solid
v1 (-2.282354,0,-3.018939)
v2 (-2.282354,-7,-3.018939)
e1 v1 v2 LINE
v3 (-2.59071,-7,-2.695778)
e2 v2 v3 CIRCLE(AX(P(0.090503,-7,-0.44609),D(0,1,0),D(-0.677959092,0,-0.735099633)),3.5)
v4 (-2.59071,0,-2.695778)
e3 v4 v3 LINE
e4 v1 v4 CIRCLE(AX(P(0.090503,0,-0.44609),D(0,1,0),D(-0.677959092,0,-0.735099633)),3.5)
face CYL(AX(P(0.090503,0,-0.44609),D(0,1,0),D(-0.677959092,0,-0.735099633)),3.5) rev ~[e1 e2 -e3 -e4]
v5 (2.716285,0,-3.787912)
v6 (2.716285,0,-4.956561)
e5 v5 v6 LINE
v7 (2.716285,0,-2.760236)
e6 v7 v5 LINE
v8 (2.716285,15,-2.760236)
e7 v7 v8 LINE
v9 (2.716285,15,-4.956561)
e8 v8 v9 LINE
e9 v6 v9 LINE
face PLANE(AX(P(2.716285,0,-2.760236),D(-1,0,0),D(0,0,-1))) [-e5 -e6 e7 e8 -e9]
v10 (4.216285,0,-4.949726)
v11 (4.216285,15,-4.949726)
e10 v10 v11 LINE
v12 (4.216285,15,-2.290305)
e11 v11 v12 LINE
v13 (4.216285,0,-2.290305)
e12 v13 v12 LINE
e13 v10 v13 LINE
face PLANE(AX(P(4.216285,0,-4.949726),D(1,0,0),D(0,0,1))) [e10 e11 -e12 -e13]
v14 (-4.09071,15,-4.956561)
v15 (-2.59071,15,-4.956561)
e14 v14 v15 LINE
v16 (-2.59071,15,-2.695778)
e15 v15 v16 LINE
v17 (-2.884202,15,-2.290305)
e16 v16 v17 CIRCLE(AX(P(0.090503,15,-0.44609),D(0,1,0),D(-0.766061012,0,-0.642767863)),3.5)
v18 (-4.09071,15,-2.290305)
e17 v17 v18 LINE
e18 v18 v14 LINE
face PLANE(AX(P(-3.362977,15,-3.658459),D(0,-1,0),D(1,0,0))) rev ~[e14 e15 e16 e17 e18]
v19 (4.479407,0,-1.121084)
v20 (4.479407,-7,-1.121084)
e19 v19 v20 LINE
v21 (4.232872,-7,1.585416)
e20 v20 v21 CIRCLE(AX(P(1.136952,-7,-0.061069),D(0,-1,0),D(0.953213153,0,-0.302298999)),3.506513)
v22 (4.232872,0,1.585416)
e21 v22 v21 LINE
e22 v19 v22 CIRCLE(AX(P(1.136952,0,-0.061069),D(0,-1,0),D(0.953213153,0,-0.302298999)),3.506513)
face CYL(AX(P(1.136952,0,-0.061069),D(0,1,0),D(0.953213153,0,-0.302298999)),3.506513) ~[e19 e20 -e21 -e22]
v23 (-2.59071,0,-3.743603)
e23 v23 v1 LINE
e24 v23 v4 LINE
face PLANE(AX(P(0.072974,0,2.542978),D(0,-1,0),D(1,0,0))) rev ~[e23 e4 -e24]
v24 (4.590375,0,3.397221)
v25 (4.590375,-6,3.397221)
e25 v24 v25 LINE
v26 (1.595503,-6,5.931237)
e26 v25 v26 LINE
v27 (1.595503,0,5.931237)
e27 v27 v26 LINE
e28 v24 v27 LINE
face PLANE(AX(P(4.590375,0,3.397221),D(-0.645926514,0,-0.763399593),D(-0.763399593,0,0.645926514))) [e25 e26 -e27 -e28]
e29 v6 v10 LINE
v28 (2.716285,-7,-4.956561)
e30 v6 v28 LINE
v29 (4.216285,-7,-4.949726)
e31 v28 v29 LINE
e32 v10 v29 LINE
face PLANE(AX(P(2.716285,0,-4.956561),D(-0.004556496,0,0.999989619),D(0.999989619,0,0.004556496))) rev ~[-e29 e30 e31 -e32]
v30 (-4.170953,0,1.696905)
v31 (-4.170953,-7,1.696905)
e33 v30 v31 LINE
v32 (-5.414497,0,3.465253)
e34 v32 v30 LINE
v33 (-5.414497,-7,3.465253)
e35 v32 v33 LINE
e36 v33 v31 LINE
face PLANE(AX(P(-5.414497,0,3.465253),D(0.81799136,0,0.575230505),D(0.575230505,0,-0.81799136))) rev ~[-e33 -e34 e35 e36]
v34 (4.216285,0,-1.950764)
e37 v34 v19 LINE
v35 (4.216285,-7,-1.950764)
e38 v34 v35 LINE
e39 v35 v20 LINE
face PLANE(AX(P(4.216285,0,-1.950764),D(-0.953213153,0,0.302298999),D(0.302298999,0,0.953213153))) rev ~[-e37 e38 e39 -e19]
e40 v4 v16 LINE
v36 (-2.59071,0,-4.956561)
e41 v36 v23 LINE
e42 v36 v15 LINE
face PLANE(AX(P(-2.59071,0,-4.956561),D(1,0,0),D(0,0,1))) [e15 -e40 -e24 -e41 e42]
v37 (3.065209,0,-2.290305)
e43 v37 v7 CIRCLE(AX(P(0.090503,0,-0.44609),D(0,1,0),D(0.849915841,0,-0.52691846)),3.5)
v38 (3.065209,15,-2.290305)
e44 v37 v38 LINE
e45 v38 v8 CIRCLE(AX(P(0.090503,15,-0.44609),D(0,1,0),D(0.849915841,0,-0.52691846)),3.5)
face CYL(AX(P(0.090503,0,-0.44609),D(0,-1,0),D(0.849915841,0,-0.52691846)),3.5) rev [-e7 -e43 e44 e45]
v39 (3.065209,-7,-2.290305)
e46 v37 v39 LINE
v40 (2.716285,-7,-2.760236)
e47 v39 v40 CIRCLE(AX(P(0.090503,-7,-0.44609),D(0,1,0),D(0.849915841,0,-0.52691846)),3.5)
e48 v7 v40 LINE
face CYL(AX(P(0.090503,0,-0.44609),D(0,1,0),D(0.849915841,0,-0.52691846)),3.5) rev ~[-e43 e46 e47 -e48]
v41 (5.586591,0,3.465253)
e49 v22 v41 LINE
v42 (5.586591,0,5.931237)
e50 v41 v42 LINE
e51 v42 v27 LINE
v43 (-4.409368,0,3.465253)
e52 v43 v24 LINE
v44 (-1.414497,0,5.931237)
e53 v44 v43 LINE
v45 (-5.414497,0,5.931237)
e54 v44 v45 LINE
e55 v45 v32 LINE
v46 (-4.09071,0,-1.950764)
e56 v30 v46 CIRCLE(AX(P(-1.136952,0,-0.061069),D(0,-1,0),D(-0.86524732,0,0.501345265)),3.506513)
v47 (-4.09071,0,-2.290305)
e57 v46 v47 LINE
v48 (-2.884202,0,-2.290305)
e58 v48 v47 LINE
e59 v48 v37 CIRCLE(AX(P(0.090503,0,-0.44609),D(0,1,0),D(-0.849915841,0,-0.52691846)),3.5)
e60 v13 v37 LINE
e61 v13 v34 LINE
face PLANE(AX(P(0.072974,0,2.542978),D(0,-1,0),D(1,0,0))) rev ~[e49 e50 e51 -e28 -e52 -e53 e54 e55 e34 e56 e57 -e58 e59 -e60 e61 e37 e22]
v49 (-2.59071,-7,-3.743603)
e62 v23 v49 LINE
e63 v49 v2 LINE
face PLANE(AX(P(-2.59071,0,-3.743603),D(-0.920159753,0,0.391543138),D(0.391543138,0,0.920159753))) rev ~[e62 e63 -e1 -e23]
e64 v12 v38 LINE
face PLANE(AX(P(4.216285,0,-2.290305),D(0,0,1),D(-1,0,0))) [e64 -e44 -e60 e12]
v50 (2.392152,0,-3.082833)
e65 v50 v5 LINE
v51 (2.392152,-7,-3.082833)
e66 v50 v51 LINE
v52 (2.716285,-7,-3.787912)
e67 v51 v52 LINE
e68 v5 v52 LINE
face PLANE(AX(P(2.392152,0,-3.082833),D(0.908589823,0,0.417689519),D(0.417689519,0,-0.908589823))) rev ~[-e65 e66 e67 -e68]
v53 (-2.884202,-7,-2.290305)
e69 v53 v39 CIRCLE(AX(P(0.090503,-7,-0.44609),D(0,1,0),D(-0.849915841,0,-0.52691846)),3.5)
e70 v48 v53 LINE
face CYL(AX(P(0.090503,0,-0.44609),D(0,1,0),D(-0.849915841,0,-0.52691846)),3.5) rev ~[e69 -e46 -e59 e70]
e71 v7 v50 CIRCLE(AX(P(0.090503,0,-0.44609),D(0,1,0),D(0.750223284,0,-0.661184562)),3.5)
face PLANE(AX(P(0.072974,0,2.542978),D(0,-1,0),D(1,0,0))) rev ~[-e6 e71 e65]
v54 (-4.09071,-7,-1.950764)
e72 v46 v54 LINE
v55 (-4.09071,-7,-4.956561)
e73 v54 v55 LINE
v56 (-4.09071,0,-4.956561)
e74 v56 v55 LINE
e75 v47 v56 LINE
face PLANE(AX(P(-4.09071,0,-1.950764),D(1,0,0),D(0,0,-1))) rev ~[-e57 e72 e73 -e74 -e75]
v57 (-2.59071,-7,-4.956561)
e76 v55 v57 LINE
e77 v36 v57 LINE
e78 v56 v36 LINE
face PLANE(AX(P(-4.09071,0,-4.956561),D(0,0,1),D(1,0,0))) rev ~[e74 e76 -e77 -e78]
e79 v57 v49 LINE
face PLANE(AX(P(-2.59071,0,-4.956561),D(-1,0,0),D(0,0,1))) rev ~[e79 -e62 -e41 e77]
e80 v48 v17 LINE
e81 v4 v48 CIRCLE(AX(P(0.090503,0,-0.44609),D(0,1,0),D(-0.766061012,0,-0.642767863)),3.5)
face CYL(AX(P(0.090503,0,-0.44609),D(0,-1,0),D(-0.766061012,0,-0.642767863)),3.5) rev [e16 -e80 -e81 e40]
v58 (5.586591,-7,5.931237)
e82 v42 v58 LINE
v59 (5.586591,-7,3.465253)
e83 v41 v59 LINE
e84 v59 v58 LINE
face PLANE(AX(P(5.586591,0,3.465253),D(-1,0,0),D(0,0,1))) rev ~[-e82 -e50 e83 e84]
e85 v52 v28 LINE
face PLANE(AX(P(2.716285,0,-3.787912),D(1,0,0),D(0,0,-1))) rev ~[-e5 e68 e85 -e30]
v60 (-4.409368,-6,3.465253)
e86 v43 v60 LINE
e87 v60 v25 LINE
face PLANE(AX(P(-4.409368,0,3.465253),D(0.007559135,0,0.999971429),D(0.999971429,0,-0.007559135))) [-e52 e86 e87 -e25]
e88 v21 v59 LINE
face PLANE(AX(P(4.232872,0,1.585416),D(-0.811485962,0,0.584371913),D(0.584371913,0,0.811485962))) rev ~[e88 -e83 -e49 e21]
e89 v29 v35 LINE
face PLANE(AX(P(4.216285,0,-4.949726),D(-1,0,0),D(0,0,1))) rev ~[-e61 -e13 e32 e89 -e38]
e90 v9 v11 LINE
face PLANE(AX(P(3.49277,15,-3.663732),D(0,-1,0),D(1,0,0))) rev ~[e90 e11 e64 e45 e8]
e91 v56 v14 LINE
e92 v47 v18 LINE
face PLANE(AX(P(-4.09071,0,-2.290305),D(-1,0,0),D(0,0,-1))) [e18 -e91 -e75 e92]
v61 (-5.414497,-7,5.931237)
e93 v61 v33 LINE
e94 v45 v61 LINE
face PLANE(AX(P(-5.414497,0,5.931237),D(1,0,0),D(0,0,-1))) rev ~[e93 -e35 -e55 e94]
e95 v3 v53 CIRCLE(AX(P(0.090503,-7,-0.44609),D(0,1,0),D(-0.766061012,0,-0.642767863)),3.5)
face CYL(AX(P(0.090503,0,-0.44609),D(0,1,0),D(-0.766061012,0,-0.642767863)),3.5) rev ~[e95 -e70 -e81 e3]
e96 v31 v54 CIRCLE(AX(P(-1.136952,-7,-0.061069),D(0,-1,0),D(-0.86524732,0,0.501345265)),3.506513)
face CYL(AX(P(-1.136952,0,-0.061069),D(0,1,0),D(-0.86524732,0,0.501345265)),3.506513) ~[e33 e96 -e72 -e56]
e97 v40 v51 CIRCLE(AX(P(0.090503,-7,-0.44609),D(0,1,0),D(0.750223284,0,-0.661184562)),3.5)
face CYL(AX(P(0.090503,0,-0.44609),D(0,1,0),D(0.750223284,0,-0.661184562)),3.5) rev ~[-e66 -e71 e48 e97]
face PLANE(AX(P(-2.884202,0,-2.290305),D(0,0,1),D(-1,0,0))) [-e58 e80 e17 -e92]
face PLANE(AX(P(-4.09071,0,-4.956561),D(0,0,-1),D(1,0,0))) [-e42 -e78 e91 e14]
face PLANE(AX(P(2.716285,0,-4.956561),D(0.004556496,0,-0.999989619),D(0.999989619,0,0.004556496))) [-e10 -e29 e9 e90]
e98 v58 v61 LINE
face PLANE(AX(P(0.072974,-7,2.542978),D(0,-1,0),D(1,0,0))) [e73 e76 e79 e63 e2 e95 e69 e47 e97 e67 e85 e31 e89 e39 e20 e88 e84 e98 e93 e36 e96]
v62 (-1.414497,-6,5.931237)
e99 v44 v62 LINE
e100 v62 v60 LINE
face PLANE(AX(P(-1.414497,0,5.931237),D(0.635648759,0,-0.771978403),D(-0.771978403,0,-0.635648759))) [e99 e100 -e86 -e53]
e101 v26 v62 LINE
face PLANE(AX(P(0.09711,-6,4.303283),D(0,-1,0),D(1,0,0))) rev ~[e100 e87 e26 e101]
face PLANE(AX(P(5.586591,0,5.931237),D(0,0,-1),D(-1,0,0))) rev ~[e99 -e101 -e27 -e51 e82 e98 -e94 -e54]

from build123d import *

# Parameters (mm, degrees)
F1_DEPTH = 7
F2_DEPTH = 6
F3_DEPTH = 15


# Not quite as in the source:
# - a feature names something its author has since deleted; it is built from what else it names


with BuildPart() as f1:
    # F0 (on Front) → F1 (new body)
    with BuildSketch(Plane.XZ):
        with BuildLine():
            Line((-4.090710345, -1.9507641112), (-3.3236176952, -1.6008211246))
            Line((-3.3236176952, -1.6008211246), (-3.3236176952, -2.2903047641))
            Line((-3.3236176952, -2.2903047641), (-2.8842022451, -2.2903047641))
            ThreePointArc((-2.8842022451, -2.2903047641), (0.0905031972, 3.0539098469), (3.0652086395, -2.2903047641))
            Line((3.0652086395, -2.2903047641), (3.4491920394, -2.2903047641))
            Line((3.4491920394, -2.2903047641), (3.4491920394, -1.6408955531))
            Line((3.4491920394, -1.6408955531), (4.2162846892, -1.9507641112))
            Line((4.2162846892, -1.9507641112), (4.4794066601, -1.1210844752))
            ThreePointArc((4.4794066601, -1.1210844752), (4.6290079186, 0.2570213688), (4.2328723206, 1.5854162054))
            Line((4.2328723206, 1.5854162054), (5.5865912817, 3.465253188))
            Line((5.5865912817, 3.465253188), (5.5865912817, 5.931237081))
            Line((5.5865912817, 5.931237081), (1.5955031972, 5.931237081))
            Line((1.5955031972, 5.931237081), (4.5903746292, 3.397220974))
            Line((4.5903746292, 3.397220974), (0.0905031972, 3.431237081))
            Line((0.0905031972, 3.431237081), (-4.4093682348, 3.465253188))
            Line((-4.4093682348, 3.465253188), (-1.4144968028, 5.931237081))
            Line((-1.4144968028, 5.931237081), (-5.4144968028, 5.931237081))
            Line((-5.4144968028, 5.931237081), (-5.4144968028, 3.465253188))
            Line((-5.4144968028, 3.465253188), (-4.1709532845, 1.6969049432))
            ThreePointArc((-4.1709532845, 1.6969049432), (-4.6426172218, -0.138188052), (-4.090710345, -1.9507641112))
        make_face()
        Polygon((-3.3236176952, -2.2903047641), (-3.3236176952, -1.6008211246), (-4.090710345, -1.9507641112), (-4.090710345, -2.2903047641), align=None)
        with BuildLine():
            Line((-2.8842022451, -2.2903047641), (-3.3236176952, -2.2903047641))
            Line((-3.3236176952, -2.2903047641), (-4.090710345, -2.2903047641))
            Line((-4.090710345, -2.2903047641), (-4.090710345, -4.9565606735))
            Line((-4.090710345, -4.9565606735), (-3.3236176952, -4.9565606735))
            Line((-3.3236176952, -4.9565606735), (-2.590710345, -4.9565606735))
            Line((-2.590710345, -4.9565606735), (-2.590710345, -3.7436034497))
            Line((-2.590710345, -3.7436034497), (-2.590710345, -2.6957776739))
            ThreePointArc((-2.590710345, -2.6957776739), (-2.7447140714, -2.4982945873), (-2.8842022451, -2.2903047641))
        make_face()
        with BuildLine():
            Line((3.4491920394, -2.2903047641), (3.0652086395, -2.2903047641))
            ThreePointArc((3.0652086395, -2.2903047641), (2.9005872431, -2.5325770701), (2.7162846892, -2.76023612))
            Line((2.7162846892, -2.76023612), (2.7162846892, -3.7879117456))
            Line((2.7162846892, -3.7879117456), (2.7162846892, -4.9565606735))
            Line((2.7162846892, -4.9565606735), (4.2162846892, -4.9497258588))
            Line((4.2162846892, -4.9497258588), (4.2162846892, -2.2903047641))
            Line((4.2162846892, -2.2903047641), (3.4491920394, -2.2903047641))
        make_face()
        with BuildLine():
            ThreePointArc((-2.2823536237, -3.0189388676), (-2.4416925097, -2.8622823851), (-2.590710345, -2.6957776739))
            Line((-2.590710345, -2.6957776739), (-2.590710345, -3.7436034497))
            Line((-2.590710345, -3.7436034497), (-2.2823536237, -3.0189388676))
        make_face()
        Polygon((3.4491920394, -1.6408955531), (3.4491920394, -2.2903047641), (4.2162846892, -2.2903047641), (4.2162846892, -1.9507641112), align=None)
        with BuildLine():
            Line((2.7162846892, -3.7879117456), (2.7162846892, -2.76023612))
            ThreePointArc((2.7162846892, -2.76023612), (2.5594926434, -2.9268342178), (2.39215173, -3.0828332258))
            Line((2.39215173, -3.0828332258), (2.7162846892, -3.7879117456))
        make_face()
        Polygon((1.5955031972, 5.931237081), (-1.4144968028, 5.931237081), (-4.4093682348, 3.465253188), (0.0905031972, 3.431237081), (4.5903746292, 3.397220974), align=None)
    extrude(amount=F1_DEPTH)

    # F0 (on Front) → F2 (cut)
    with BuildSketch(Plane.XZ):
        Polygon((1.5955031972, 5.931237081), (-1.4144968028, 5.931237081), (-4.4093682348, 3.465253188), (0.0905031972, 3.431237081), (4.5903746292, 3.397220974), align=None)
    extrude(amount=F2_DEPTH, mode=Mode.SUBTRACT)

    # F0 (on Front) → F3 (join)
    with BuildSketch(Plane.XZ):
        with BuildLine():
            Line((-2.8842022451, -2.2903047641), (-3.3236176952, -2.2903047641))
            Line((-3.3236176952, -2.2903047641), (-4.090710345, -2.2903047641))
            Line((-4.090710345, -2.2903047641), (-4.090710345, -4.9565606735))
            Line((-4.090710345, -4.9565606735), (-3.3236176952, -4.9565606735))
            Line((-3.3236176952, -4.9565606735), (-2.590710345, -4.9565606735))
            Line((-2.590710345, -4.9565606735), (-2.590710345, -3.7436034497))
            Line((-2.590710345, -3.7436034497), (-2.590710345, -2.6957776739))
            ThreePointArc((-2.590710345, -2.6957776739), (-2.7447140714, -2.4982945873), (-2.8842022451, -2.2903047641))
        make_face()
        with BuildLine():
            Line((3.4491920394, -2.2903047641), (3.0652086395, -2.2903047641))
            ThreePointArc((3.0652086395, -2.2903047641), (2.9005872431, -2.5325770701), (2.7162846892, -2.76023612))
            Line((2.7162846892, -2.76023612), (2.7162846892, -3.7879117456))
            Line((2.7162846892, -3.7879117456), (2.7162846892, -4.9565606735))
            Line((2.7162846892, -4.9565606735), (4.2162846892, -4.9497258588))
            Line((4.2162846892, -4.9497258588), (4.2162846892, -2.2903047641))
            Line((4.2162846892, -2.2903047641), (3.4491920394, -2.2903047641))
        make_face()
    extrude(amount=-F3_DEPTH)


solid = f1.part
